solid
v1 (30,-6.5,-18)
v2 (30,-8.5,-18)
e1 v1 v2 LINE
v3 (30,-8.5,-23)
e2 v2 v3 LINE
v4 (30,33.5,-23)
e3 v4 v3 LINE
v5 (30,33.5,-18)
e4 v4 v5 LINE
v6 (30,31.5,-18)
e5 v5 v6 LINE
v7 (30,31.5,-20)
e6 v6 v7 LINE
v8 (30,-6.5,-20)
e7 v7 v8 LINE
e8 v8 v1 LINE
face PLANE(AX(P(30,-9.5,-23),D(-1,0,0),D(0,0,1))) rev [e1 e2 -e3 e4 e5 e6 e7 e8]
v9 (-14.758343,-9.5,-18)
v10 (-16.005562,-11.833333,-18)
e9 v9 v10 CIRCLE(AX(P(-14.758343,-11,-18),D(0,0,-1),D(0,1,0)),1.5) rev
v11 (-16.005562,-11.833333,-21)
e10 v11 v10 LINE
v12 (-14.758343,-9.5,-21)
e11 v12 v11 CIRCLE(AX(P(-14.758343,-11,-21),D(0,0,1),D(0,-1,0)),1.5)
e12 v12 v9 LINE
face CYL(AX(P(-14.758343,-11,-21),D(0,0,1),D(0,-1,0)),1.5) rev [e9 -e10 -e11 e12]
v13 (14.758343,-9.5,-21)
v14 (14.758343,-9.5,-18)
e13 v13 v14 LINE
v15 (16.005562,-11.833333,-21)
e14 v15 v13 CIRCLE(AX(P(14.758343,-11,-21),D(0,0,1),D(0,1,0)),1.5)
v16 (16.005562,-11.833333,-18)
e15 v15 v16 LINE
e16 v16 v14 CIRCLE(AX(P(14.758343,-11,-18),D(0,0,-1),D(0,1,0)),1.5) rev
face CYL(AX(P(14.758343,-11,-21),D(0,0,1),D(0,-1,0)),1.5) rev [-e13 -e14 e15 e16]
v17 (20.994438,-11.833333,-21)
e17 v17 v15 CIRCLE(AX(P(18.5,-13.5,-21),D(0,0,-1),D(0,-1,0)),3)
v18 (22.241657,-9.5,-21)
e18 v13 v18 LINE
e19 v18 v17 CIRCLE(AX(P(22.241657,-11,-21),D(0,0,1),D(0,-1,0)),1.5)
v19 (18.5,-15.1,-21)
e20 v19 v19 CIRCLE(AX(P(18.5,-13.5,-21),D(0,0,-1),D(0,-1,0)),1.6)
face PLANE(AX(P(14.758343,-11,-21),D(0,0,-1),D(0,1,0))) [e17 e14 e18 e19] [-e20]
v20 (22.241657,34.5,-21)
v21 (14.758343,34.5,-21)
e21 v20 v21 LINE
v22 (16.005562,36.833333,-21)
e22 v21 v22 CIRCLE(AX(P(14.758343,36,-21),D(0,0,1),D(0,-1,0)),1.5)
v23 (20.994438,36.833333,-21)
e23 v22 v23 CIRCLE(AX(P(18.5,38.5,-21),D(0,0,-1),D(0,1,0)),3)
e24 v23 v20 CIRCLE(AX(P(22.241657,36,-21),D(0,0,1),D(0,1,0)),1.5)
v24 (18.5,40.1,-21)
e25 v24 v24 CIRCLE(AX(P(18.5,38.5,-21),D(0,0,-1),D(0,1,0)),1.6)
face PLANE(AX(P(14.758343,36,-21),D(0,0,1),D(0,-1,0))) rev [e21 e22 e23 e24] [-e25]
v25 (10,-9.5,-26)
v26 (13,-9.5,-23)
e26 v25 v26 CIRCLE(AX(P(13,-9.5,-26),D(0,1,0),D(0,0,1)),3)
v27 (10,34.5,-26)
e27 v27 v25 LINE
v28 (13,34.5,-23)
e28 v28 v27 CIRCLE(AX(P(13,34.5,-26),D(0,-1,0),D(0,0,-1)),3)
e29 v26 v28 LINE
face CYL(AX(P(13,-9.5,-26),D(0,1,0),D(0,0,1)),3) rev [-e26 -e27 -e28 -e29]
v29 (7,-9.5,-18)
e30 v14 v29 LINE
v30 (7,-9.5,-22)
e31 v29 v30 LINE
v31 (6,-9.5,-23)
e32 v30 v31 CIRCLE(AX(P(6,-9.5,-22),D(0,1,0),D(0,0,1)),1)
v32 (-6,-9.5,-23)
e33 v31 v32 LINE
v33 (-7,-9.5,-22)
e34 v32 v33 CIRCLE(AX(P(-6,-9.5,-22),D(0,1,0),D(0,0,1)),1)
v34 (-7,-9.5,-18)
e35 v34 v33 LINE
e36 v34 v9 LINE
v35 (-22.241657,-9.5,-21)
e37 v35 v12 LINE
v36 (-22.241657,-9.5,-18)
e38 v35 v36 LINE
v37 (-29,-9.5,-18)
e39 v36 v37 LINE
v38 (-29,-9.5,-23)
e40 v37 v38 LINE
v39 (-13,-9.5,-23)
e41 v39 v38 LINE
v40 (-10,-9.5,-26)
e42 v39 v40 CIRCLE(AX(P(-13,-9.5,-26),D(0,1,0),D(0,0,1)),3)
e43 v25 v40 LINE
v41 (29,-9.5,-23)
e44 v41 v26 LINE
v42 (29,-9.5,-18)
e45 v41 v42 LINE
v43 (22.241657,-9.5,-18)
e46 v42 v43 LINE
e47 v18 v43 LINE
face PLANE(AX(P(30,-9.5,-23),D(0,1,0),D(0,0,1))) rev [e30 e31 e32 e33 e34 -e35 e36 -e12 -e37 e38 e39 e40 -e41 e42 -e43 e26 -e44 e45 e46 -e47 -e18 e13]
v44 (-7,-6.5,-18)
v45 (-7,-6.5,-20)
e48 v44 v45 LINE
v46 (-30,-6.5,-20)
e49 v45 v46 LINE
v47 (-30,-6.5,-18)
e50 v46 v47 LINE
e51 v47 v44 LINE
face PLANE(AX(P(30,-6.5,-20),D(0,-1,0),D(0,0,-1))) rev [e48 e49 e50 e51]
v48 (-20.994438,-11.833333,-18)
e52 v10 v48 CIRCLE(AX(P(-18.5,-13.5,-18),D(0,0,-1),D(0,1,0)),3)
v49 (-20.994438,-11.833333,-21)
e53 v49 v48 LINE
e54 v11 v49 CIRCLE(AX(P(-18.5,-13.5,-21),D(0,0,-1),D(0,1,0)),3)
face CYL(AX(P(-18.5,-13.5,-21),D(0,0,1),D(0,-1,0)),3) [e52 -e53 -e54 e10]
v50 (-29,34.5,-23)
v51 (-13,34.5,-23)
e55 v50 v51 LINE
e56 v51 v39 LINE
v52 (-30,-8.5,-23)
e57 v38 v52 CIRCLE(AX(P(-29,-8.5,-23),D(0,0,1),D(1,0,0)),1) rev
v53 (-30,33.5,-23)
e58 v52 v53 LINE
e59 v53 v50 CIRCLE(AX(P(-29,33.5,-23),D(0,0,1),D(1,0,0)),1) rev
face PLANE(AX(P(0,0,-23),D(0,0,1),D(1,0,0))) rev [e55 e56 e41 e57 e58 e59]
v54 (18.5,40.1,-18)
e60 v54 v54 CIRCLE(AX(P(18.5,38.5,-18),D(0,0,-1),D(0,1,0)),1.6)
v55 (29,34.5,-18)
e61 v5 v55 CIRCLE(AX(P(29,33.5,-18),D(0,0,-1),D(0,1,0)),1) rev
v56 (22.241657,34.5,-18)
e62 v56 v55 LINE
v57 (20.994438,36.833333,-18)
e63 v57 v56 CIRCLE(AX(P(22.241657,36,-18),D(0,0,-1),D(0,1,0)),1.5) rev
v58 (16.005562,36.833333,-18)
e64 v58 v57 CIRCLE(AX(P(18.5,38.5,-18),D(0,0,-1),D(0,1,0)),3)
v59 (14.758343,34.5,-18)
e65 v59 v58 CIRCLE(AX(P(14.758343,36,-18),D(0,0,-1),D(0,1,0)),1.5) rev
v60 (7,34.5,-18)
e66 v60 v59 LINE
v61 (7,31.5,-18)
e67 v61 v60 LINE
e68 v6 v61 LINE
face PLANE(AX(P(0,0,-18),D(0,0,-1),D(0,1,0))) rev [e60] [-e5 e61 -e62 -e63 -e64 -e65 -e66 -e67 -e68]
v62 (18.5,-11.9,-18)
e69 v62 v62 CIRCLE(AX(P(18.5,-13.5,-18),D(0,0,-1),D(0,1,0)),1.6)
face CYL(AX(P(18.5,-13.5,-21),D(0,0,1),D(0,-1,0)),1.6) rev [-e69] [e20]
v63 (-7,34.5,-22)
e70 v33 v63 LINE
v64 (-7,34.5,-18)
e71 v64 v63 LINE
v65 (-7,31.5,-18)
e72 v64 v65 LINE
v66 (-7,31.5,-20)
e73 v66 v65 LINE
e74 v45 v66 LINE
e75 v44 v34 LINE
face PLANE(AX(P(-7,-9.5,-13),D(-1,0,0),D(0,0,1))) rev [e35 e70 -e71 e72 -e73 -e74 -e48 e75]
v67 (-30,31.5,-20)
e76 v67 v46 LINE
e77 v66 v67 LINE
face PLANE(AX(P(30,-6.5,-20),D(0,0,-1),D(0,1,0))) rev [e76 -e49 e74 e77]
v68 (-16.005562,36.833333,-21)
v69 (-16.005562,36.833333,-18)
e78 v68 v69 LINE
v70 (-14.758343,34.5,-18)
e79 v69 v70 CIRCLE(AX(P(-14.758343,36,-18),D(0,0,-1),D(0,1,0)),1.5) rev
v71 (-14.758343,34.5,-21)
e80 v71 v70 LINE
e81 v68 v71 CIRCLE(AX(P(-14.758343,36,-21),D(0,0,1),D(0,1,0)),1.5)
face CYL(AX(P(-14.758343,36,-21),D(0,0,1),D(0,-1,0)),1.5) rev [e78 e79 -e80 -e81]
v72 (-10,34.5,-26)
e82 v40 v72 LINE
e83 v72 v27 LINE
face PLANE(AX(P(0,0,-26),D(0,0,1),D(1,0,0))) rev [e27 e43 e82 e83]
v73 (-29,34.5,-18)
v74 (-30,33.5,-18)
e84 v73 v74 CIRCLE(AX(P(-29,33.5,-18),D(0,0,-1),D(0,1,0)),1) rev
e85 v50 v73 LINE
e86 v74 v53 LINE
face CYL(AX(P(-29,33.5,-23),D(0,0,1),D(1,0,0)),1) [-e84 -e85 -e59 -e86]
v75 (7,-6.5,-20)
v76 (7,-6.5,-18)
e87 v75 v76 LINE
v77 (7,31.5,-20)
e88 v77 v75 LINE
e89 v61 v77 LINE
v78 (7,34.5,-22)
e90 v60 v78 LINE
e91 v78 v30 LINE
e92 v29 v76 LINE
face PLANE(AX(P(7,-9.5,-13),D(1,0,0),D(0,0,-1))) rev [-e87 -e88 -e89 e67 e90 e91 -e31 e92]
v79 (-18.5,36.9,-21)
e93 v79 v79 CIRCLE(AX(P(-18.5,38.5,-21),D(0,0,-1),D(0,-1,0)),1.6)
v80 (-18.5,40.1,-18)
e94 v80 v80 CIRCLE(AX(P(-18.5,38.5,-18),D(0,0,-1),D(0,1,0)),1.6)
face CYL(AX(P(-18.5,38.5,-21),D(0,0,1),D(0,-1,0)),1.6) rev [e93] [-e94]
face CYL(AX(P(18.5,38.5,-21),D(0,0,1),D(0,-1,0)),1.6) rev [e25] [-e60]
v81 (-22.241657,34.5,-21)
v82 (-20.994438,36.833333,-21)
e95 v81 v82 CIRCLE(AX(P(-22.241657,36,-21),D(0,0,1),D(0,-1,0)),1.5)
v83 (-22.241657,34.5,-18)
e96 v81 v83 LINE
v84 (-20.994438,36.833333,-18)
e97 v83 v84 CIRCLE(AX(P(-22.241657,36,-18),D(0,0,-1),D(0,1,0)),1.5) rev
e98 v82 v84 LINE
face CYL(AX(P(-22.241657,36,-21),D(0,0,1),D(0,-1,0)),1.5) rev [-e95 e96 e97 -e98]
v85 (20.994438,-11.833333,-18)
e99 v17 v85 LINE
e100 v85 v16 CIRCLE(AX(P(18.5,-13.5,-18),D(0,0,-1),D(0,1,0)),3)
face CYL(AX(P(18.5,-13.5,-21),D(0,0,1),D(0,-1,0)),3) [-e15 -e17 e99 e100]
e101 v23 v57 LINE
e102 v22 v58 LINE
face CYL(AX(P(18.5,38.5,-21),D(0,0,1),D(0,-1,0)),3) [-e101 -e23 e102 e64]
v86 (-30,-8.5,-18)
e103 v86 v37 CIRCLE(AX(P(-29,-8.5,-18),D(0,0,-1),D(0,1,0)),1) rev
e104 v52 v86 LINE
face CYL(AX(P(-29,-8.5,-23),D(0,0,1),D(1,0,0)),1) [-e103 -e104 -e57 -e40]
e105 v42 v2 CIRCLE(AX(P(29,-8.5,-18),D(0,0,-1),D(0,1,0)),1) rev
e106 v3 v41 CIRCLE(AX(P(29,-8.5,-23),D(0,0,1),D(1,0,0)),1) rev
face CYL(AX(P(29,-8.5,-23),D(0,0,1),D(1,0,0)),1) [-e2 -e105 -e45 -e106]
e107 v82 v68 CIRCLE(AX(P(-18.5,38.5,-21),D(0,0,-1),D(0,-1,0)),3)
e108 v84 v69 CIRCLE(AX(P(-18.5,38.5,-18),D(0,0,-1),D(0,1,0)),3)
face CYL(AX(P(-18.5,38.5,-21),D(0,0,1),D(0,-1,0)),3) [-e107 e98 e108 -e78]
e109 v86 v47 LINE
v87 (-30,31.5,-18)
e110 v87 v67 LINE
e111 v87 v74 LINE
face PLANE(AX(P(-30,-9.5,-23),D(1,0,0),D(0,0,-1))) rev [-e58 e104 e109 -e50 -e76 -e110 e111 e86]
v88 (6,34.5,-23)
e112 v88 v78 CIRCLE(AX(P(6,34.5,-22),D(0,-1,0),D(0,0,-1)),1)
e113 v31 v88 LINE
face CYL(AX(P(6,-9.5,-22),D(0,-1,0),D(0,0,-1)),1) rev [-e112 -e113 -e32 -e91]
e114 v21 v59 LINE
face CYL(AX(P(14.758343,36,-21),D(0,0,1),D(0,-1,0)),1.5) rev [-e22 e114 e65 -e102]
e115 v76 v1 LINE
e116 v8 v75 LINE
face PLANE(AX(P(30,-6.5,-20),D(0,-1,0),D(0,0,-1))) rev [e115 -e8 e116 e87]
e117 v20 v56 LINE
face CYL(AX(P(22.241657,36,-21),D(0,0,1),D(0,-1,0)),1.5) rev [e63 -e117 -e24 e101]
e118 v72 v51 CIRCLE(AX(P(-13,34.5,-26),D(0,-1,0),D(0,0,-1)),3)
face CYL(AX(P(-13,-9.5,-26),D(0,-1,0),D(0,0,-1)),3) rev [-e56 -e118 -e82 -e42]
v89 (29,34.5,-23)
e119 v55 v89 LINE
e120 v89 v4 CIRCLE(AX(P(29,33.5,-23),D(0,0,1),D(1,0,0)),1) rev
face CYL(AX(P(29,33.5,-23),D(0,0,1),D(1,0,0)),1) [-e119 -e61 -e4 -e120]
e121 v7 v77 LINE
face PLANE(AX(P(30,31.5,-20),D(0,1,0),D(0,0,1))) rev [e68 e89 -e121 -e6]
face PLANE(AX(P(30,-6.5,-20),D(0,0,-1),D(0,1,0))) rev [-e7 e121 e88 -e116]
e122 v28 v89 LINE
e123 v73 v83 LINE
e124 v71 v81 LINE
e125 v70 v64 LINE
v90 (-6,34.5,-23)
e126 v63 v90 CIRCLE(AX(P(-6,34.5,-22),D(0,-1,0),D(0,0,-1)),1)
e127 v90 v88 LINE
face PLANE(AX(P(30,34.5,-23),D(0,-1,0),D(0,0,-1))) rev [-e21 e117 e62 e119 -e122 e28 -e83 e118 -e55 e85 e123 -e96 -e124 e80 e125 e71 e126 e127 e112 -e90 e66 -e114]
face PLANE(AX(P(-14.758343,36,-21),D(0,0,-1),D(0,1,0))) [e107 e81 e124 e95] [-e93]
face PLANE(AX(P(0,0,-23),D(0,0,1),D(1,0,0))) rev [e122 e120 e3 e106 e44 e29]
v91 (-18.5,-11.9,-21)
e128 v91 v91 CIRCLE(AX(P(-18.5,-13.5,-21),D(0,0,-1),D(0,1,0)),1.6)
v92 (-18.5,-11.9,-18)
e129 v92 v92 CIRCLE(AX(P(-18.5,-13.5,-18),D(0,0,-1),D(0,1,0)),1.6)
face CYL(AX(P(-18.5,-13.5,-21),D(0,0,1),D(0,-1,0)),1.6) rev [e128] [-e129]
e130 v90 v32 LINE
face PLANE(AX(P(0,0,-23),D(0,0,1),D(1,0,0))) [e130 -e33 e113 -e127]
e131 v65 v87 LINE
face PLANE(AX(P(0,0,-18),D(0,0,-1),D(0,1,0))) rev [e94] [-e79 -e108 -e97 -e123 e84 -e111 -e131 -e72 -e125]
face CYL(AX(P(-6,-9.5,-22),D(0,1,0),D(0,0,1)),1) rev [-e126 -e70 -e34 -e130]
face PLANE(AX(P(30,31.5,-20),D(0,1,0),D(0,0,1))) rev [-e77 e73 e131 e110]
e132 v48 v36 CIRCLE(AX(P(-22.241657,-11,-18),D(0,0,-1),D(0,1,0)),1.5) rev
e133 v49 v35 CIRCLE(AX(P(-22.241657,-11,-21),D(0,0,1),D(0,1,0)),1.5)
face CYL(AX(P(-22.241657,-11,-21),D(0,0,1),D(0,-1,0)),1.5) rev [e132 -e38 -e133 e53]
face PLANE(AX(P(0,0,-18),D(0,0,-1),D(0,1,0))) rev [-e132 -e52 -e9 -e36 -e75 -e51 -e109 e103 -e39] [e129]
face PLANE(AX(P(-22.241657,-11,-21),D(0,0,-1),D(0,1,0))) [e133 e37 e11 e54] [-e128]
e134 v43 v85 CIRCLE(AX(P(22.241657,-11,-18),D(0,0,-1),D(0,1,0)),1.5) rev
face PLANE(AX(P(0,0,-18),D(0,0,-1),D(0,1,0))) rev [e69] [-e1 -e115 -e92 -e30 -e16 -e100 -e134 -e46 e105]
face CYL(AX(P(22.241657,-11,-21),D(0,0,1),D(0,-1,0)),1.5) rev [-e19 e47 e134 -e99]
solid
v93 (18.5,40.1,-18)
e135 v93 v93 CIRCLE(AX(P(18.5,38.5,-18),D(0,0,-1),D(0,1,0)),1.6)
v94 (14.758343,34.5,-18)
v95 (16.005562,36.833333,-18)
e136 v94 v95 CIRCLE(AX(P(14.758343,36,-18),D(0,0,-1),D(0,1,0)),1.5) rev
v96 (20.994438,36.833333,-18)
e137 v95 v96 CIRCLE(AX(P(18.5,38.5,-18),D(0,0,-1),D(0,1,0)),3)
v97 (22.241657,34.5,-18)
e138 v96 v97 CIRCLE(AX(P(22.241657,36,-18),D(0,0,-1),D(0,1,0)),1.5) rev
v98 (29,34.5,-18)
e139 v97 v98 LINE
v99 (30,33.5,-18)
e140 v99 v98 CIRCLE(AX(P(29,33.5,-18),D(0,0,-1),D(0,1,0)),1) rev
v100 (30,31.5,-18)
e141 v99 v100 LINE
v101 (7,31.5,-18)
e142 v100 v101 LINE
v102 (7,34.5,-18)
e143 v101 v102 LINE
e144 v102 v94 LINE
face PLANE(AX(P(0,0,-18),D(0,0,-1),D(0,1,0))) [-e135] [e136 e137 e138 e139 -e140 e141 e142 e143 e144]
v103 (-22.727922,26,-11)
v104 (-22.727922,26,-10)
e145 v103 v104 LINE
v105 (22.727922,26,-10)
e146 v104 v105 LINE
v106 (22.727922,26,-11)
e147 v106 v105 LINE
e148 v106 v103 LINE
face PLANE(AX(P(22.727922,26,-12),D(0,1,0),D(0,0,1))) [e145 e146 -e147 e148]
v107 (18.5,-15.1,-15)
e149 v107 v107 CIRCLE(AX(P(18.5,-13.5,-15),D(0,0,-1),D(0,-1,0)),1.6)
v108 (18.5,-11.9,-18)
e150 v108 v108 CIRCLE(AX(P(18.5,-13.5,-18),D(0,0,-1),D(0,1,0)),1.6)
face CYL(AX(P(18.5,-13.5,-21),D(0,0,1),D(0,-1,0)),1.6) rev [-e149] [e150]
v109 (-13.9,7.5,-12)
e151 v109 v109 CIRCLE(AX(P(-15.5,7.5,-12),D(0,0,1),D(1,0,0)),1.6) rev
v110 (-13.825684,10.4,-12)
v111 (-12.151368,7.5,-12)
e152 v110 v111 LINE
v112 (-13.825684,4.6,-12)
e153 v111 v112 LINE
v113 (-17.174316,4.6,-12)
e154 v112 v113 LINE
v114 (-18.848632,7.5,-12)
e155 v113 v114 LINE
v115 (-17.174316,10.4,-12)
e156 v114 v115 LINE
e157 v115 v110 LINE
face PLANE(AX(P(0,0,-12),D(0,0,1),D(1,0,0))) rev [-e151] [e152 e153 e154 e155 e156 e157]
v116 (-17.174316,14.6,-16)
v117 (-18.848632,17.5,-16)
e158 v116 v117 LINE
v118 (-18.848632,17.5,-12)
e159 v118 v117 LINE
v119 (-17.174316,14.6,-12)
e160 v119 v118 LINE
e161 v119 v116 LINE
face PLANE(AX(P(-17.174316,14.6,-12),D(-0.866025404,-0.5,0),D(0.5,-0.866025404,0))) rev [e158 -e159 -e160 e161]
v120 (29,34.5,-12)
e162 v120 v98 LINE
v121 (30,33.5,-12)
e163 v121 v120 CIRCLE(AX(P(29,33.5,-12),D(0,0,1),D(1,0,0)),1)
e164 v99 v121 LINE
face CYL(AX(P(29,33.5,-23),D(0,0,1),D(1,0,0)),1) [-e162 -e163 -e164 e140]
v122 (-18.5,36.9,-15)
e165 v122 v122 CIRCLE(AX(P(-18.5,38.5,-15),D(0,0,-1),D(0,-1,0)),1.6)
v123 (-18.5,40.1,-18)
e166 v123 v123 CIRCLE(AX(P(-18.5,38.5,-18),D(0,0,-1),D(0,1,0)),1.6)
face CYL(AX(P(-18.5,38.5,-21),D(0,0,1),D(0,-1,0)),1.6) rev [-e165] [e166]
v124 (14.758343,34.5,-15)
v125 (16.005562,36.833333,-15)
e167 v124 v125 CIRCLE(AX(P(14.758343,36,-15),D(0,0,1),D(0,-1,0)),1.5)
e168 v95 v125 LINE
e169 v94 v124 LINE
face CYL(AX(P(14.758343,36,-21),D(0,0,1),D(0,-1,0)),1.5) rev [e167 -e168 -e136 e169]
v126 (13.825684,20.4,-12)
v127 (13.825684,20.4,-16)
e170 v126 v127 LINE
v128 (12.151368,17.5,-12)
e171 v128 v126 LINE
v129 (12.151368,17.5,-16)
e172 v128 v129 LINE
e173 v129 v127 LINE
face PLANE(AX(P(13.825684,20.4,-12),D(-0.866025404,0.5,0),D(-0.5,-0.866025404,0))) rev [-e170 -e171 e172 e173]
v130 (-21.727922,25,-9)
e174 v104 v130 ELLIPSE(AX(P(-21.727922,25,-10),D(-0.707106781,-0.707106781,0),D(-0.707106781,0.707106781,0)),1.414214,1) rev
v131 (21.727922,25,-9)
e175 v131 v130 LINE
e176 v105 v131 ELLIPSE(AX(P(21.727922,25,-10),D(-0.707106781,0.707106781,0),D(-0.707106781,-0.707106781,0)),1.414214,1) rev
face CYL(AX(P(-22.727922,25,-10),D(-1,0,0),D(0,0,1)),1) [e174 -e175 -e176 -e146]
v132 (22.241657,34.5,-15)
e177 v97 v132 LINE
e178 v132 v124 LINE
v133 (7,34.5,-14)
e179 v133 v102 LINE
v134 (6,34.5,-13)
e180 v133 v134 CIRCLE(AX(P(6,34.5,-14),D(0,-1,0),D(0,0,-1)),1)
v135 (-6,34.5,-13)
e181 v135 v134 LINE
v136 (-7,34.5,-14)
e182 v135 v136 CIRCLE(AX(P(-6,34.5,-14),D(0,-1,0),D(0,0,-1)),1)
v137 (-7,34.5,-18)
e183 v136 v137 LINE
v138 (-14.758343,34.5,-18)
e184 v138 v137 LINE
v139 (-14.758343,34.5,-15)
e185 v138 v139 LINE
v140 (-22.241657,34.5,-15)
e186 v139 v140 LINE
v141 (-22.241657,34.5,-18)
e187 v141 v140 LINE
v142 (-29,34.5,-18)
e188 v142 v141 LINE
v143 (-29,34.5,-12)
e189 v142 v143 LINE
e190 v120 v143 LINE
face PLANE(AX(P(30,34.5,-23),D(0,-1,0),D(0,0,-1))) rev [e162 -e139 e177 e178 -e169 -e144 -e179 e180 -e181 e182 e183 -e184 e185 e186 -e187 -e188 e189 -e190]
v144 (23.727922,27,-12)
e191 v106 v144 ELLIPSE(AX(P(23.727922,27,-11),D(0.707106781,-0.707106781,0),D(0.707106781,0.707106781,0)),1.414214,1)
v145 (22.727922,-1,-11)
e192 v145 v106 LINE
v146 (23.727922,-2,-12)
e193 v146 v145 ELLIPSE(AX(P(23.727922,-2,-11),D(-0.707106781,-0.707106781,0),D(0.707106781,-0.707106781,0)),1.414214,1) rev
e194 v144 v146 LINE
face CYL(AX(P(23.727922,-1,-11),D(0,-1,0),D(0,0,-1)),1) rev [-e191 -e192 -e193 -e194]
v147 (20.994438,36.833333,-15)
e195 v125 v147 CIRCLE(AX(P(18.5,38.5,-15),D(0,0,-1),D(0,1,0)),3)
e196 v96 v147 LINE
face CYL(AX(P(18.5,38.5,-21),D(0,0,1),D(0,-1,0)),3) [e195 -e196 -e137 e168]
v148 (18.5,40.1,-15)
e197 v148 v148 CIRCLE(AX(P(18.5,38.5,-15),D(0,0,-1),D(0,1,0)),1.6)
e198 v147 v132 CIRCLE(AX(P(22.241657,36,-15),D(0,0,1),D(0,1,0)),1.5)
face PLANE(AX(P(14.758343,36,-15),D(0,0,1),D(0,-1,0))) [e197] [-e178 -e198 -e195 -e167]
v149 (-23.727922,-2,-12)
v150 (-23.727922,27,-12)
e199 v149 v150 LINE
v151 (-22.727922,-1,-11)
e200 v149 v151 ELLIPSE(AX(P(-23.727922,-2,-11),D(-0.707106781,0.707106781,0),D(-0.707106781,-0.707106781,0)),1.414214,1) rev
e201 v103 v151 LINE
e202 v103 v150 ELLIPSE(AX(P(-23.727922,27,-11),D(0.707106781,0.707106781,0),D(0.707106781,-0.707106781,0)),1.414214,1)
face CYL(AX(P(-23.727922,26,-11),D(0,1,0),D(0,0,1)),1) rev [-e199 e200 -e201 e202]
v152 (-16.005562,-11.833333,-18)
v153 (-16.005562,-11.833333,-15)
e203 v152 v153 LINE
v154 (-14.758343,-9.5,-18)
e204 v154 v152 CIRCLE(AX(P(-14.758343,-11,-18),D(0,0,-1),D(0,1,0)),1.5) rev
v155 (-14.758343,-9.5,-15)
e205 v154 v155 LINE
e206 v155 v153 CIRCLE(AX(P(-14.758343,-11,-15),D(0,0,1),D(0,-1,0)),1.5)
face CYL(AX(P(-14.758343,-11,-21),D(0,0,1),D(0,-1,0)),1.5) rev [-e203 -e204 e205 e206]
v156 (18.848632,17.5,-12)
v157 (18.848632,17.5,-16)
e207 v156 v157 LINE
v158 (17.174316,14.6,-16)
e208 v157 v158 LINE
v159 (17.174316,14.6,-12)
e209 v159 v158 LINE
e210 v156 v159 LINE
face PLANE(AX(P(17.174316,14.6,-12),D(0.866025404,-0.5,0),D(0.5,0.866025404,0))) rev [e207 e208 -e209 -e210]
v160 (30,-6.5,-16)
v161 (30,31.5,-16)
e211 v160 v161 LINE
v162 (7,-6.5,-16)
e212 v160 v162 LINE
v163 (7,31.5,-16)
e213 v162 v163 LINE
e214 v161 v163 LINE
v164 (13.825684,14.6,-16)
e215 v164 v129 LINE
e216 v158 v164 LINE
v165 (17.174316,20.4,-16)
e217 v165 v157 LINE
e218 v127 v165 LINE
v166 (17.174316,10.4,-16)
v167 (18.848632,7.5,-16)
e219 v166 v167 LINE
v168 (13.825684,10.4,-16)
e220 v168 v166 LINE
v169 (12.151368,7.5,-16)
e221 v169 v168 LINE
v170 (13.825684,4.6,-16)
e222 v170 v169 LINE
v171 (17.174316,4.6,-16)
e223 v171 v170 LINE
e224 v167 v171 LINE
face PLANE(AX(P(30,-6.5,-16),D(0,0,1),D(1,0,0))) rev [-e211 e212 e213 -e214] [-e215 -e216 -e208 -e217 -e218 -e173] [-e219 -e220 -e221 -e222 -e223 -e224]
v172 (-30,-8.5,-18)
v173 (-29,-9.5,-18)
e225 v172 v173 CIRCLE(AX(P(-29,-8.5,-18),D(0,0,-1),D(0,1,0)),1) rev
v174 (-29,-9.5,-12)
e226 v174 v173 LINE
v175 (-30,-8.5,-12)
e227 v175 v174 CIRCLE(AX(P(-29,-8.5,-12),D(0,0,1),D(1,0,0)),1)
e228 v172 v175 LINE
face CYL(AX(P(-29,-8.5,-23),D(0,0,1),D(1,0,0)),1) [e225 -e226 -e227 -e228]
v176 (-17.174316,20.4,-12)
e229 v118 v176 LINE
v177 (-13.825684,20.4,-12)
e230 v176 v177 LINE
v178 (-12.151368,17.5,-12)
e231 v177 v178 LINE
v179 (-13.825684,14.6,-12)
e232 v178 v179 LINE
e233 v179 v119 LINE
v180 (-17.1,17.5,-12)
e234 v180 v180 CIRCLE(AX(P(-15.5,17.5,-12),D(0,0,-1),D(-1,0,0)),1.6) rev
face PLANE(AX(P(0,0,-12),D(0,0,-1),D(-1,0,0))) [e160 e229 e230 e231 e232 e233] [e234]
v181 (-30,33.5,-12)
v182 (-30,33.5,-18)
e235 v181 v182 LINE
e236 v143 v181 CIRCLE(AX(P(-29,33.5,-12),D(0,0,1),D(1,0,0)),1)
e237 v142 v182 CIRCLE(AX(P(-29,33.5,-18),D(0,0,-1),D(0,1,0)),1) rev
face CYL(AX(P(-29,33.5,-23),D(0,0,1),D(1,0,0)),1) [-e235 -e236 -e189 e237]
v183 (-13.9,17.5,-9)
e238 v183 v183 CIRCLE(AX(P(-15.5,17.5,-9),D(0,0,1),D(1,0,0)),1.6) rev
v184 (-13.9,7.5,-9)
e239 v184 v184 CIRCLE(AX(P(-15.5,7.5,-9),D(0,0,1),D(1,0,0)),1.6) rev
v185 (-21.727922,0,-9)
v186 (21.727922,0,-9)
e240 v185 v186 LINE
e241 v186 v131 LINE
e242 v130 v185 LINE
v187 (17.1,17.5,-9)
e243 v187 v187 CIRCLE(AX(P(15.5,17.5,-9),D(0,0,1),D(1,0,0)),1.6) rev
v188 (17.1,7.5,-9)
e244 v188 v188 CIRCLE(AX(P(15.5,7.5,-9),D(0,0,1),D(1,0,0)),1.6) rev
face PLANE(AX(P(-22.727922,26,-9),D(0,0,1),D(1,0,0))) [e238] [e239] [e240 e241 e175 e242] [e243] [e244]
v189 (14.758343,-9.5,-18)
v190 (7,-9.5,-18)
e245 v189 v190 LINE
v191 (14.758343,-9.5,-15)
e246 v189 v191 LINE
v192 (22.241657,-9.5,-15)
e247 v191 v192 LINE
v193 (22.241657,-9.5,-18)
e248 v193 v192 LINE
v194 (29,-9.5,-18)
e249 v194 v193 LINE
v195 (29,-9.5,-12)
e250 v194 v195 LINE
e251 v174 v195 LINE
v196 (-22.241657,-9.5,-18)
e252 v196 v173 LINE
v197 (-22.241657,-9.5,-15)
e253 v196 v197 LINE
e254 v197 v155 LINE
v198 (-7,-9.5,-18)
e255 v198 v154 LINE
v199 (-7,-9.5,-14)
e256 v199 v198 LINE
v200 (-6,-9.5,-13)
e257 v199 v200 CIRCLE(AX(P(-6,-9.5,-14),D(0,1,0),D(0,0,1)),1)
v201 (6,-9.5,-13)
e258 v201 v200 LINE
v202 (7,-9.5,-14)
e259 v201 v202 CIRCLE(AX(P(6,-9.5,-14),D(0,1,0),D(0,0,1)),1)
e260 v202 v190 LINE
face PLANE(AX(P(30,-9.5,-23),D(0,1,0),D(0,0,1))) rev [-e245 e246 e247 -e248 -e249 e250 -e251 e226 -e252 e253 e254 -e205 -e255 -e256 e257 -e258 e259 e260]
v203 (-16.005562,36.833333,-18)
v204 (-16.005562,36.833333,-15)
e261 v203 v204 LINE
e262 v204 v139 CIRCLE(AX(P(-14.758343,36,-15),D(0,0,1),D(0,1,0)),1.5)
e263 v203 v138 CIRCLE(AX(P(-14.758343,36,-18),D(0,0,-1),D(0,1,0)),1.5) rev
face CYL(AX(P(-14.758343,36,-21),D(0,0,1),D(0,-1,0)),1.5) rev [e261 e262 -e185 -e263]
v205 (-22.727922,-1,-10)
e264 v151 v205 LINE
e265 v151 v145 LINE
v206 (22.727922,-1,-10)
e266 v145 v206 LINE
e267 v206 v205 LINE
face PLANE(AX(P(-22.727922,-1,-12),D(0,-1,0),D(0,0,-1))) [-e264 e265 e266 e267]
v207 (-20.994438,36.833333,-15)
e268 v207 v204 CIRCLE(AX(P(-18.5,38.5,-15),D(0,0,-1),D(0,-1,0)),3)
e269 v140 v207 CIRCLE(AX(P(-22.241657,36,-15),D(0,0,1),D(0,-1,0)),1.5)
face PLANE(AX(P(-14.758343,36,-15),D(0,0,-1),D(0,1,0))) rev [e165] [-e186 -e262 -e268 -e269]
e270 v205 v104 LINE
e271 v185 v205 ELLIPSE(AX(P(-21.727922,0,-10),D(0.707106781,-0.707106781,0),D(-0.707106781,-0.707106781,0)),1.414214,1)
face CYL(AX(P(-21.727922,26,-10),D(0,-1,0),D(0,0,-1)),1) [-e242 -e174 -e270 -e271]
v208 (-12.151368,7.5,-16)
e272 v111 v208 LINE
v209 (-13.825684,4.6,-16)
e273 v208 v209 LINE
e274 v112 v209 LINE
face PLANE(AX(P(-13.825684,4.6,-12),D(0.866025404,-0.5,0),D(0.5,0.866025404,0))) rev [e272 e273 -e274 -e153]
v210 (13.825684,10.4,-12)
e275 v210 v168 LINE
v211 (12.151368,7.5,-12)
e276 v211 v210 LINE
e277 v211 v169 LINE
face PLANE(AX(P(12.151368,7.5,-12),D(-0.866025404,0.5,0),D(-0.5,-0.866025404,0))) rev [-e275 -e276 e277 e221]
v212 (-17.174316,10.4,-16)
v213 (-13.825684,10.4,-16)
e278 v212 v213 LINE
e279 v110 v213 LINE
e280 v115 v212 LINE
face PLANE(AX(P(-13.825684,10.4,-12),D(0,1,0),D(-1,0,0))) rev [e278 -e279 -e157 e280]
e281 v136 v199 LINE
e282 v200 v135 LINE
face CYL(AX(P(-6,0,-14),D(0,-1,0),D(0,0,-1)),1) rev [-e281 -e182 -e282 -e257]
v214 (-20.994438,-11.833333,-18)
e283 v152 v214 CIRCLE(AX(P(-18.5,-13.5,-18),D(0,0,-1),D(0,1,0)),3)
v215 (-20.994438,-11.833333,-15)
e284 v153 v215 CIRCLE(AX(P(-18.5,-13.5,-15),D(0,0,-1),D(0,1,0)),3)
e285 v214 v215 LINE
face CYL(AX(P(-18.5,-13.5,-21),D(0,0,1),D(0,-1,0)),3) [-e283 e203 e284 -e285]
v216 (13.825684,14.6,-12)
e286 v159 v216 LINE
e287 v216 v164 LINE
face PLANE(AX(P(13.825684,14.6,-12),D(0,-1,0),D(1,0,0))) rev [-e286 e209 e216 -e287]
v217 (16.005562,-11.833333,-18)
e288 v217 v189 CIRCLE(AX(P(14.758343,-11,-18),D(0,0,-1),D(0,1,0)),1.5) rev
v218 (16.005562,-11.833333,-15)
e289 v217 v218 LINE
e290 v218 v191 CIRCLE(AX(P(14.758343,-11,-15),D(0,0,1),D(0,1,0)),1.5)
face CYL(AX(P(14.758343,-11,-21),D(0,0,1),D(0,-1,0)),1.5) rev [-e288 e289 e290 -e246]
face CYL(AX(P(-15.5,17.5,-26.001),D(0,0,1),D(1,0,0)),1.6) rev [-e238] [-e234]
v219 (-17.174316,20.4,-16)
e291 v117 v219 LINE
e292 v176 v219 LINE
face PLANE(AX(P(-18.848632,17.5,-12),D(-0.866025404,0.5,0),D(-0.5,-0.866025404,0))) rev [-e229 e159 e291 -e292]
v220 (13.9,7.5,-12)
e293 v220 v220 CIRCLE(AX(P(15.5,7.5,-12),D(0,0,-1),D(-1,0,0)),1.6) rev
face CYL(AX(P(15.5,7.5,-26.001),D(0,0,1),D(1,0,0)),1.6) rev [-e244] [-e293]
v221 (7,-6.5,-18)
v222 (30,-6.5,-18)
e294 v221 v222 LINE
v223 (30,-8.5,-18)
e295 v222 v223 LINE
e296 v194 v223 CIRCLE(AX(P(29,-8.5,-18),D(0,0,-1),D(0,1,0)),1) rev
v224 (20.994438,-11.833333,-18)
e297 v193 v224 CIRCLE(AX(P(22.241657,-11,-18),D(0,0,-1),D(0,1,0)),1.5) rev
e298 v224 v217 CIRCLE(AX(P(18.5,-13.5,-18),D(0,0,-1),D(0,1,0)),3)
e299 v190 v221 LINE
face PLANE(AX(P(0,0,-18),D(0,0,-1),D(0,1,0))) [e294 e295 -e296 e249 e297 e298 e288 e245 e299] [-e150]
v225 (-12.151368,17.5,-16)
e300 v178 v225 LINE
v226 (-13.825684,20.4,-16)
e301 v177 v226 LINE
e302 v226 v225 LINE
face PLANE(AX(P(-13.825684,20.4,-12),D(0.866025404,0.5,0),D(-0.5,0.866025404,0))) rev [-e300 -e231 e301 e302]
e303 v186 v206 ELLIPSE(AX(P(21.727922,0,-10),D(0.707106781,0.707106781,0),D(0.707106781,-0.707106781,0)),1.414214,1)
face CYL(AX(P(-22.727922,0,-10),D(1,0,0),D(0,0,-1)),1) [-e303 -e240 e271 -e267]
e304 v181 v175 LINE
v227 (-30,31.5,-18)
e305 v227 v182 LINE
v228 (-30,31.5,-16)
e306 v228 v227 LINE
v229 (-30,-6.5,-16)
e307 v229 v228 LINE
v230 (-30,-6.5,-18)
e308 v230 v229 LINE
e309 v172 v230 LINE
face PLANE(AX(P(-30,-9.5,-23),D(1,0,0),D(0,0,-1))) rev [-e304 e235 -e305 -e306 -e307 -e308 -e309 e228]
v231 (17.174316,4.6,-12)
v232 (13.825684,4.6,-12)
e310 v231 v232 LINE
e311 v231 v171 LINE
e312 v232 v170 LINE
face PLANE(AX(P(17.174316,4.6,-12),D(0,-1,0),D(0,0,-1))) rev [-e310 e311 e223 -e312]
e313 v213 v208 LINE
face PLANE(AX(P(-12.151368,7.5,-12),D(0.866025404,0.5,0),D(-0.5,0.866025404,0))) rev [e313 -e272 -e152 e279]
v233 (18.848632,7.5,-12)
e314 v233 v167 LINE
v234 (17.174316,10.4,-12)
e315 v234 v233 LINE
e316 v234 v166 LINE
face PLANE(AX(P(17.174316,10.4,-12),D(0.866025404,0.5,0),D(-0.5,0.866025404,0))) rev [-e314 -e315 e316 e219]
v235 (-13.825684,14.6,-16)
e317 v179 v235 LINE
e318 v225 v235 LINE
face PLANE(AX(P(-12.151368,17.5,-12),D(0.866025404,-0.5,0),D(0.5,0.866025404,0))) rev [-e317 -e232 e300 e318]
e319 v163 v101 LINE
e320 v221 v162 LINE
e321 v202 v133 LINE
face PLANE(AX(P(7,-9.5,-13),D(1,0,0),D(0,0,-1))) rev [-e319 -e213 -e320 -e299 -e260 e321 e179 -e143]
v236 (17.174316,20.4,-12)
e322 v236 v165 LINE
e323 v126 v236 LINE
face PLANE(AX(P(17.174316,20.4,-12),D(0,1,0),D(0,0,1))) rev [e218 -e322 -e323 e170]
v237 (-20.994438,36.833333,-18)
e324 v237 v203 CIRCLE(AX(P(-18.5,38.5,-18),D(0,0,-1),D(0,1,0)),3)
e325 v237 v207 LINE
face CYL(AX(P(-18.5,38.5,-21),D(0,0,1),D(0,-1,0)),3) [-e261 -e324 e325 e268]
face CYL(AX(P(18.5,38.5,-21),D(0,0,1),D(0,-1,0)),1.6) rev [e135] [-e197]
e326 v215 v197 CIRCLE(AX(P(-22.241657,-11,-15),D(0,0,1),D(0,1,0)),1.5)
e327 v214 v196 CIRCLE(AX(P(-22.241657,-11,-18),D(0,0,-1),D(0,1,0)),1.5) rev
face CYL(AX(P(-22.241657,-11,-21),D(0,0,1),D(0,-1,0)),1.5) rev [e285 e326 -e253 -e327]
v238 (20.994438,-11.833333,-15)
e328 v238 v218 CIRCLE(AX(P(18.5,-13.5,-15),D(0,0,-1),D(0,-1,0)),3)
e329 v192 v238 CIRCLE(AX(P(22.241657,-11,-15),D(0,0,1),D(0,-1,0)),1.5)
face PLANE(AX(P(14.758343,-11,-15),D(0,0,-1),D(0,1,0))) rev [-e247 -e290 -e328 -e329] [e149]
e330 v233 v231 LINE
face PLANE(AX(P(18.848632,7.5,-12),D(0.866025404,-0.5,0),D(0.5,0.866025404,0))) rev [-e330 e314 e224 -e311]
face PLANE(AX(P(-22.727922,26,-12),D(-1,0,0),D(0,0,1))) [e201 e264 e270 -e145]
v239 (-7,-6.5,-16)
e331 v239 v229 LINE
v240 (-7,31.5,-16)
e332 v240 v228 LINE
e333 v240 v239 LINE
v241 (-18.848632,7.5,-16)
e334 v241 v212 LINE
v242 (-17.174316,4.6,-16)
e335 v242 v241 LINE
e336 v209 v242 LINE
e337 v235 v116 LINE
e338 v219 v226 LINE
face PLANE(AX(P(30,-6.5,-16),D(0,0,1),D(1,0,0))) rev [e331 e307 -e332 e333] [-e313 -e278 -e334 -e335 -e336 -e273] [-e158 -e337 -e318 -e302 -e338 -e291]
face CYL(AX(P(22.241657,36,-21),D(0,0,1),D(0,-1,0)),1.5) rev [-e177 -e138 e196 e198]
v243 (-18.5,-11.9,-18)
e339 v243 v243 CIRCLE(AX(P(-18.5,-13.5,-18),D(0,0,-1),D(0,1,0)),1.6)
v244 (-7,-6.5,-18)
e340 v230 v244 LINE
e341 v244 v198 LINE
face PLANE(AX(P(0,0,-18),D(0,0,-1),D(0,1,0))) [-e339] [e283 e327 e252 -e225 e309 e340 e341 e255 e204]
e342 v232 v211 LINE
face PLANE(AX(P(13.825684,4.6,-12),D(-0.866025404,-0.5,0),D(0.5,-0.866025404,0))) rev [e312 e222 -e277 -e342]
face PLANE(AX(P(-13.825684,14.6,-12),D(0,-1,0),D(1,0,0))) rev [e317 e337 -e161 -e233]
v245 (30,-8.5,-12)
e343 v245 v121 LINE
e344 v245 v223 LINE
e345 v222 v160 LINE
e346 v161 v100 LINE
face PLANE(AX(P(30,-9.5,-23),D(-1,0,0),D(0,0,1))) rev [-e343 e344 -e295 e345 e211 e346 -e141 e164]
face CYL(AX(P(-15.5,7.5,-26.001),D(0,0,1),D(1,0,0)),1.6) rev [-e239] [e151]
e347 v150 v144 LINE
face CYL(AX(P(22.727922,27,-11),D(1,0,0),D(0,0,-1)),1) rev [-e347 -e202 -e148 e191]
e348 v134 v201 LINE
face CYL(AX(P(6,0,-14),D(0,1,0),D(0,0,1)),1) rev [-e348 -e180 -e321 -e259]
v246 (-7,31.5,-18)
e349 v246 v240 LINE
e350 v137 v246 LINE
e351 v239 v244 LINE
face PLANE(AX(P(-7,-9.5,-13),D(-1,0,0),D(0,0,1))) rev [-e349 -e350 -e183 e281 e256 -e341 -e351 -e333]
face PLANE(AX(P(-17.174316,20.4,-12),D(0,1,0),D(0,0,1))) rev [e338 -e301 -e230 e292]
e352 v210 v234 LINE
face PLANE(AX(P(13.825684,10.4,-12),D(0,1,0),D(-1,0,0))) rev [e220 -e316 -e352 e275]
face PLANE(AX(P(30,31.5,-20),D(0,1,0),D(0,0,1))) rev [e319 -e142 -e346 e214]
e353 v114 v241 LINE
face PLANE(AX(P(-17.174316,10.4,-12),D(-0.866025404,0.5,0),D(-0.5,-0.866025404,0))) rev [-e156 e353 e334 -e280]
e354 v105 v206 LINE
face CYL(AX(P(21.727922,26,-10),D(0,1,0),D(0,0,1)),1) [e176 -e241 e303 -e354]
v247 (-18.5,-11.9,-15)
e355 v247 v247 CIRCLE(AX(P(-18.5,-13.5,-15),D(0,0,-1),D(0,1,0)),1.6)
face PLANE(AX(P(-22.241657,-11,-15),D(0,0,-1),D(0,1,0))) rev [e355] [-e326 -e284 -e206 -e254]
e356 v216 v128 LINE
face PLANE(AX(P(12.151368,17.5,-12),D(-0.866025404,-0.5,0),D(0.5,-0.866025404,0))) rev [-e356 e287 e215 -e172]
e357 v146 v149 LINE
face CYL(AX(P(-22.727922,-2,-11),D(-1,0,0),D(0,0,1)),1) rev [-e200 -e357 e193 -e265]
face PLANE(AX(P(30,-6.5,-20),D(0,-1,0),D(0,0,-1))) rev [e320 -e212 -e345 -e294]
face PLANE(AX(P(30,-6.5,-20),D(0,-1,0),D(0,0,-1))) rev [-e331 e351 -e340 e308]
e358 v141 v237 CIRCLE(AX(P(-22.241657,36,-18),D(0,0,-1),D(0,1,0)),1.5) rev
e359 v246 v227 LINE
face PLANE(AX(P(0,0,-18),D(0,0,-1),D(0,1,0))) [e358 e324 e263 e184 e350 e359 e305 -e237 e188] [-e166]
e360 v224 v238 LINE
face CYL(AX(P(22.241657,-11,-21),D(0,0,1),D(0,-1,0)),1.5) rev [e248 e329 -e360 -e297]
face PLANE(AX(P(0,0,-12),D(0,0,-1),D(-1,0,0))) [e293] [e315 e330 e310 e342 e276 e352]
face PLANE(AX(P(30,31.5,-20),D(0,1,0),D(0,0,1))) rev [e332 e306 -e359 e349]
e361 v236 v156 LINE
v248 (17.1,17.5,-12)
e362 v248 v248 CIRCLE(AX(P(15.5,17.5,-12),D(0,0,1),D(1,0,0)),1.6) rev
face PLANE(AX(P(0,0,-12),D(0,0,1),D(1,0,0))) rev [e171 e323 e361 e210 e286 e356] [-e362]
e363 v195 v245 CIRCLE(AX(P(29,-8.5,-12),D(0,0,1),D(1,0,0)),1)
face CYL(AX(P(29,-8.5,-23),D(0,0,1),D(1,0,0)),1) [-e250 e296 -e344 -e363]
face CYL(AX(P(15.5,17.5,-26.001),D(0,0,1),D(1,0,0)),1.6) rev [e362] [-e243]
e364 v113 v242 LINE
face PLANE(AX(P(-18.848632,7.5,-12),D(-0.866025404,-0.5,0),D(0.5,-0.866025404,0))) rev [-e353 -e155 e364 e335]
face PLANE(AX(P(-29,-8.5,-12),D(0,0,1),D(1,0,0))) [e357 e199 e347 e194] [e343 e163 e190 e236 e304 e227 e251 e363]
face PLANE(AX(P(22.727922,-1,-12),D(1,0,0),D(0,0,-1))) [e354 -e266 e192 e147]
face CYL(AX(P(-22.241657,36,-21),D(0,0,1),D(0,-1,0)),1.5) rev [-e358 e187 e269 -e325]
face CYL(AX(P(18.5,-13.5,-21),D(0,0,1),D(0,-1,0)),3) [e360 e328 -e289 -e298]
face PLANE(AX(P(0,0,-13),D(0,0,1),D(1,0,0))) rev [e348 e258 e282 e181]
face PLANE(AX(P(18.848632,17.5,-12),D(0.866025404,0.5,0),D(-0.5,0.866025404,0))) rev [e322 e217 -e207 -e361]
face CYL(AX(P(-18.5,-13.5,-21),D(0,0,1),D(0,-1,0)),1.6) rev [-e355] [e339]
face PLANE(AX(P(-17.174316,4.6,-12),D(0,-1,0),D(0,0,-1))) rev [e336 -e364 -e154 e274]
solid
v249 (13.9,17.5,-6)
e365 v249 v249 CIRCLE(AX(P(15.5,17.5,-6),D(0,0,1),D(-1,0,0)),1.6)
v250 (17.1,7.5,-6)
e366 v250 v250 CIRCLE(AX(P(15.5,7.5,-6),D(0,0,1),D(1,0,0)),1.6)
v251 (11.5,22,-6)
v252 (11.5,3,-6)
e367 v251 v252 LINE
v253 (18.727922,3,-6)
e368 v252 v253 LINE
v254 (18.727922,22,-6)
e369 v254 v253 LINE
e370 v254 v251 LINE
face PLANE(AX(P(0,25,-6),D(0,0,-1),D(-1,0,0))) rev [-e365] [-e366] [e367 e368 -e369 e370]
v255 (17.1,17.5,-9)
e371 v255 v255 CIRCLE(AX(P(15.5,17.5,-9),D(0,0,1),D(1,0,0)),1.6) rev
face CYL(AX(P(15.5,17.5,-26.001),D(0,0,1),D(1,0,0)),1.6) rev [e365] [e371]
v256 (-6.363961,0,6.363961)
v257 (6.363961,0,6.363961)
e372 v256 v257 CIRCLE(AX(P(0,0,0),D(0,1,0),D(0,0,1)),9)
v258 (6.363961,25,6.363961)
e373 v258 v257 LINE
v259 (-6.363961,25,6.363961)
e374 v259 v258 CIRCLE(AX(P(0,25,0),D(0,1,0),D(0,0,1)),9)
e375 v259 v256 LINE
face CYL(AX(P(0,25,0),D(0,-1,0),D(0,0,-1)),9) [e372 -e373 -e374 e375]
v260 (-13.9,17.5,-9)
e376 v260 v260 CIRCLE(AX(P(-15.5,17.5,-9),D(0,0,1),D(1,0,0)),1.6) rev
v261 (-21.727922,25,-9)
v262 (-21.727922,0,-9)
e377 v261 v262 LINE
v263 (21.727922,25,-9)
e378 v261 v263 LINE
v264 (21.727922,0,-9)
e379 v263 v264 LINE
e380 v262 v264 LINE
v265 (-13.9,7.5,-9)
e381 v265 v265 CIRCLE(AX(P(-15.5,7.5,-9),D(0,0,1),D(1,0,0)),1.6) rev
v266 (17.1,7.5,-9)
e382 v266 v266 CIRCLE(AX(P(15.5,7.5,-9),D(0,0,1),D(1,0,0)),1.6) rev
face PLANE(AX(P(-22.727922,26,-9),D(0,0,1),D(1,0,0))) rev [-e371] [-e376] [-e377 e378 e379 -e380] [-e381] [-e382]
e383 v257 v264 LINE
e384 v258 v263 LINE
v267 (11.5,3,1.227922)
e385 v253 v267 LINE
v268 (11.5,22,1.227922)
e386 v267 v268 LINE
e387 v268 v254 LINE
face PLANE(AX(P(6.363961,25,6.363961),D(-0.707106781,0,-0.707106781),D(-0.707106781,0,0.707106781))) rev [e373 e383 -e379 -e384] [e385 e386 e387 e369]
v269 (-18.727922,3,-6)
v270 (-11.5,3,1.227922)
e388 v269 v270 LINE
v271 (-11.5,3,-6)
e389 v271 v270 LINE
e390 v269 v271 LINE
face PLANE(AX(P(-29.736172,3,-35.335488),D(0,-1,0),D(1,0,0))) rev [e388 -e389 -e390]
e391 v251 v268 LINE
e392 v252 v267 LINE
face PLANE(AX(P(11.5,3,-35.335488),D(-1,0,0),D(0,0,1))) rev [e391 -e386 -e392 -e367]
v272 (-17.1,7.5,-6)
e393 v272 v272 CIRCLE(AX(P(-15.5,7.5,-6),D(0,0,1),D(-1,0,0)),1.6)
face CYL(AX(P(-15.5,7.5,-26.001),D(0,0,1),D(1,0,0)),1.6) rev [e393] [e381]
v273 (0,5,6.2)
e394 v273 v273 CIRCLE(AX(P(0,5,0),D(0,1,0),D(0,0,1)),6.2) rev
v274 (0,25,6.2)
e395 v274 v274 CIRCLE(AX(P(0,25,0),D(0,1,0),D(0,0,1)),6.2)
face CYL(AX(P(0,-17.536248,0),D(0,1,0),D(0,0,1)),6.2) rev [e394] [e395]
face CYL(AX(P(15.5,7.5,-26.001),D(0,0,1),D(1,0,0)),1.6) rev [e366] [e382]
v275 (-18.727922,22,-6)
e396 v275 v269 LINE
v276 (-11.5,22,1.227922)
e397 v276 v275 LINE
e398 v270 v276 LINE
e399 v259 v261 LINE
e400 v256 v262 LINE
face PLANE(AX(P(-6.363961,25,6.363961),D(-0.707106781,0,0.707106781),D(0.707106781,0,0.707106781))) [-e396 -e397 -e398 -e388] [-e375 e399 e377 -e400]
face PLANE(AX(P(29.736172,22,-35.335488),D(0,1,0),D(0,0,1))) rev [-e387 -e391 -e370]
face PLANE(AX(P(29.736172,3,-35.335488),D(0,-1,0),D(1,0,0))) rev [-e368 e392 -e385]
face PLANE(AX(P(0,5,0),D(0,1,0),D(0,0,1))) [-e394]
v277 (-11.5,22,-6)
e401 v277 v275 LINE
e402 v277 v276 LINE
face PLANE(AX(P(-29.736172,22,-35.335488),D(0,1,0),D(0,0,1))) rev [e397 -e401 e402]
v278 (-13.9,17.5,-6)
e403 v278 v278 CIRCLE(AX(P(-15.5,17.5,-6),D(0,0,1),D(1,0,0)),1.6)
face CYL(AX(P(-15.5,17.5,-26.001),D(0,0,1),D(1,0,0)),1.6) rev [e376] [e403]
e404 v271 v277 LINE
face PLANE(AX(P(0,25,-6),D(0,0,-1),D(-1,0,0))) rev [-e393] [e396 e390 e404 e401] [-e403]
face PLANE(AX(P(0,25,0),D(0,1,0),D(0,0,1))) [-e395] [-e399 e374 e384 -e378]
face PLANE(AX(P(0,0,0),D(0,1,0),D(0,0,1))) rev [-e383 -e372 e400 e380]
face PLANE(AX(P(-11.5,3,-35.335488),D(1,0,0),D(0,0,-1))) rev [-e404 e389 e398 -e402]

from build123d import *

# Parameters (mm, degrees)
EXTRUDE_1_DEPTH     = 25
SKETCH_2_R          = 6.2
CUT_EXTRUDE_1_DEPTH = 20
SKETCH_3_W          = 18.236171571
SKETCH_3_H          = 19
CUT_EXTRUDE_2_DEPTH = 15
SKETCH_5_W          = 60
SKETCH_5_H          = 44
EXTRUDE_2_DEPTH     = 14
SKETCH_6_W          = 4
SKETCH_6_H          = 38
CUT_EXTRUDE_4_DEPTH = 73.933188604
SKETCH_7_W          = 14
SKETCH_7_H          = 44
CUT_EXTRUDE_5_DEPTH = 10
SKETCH_9_R          = 1.6
EXTRUDE_3_DEPTH     = 3
SKETCH_10_W         = 20
SKETCH_10_H         = 44
EXTRUDE_4_DEPTH     = 3
FILLET_1_R          = 3
FILLET_2_R          = 1
FILLET_3_R          = 1
SKETCH_4_R          = 1.6
CUT_EXTRUDE_3_DEPTH = 10
CUT_EXTRUDE_6_DEPTH = 4
CUT_EXTRUDE_START   = -3
SKETCH_11_W         = 45.455844122
SKETCH_11_H         = 27
CUT_EXTRUDE_7_DEPTH = 3
FILLET_4_R          = 1
FILLET_5_R          = 1


# Read off the part's stored shape, not the designer's step: 分割2
with BuildPart() as part:
    # 草图1 → 凸台-拉伸1 (new body)
    with BuildSketch(Plane(origin=(0, 0, 0), x_dir=(1, 0, 0), z_dir=(0, 1, 0))):
        with BuildLine():
            ThreePointArc((-6.363961031, -6.363961031), (-8.314915793, 3.444150891), (-1e-09, 9))
            Line((-1e-09, 9), (-21.727922061, 9))
            Line((-21.727922061, 9), (-6.363961031, -6.363961031))
        make_face()
        with BuildLine():
            Line((21.727922061, 9), (-1e-09, 9))
            ThreePointArc((-1e-09, 9), (6.36396103, 6.363961031), (9, 0))
            ThreePointArc((9, 0), (8.314915793, -3.444150891), (6.363961031, -6.363961031))
            Line((6.363961031, -6.363961031), (21.727922061, 9))
        make_face()
        with BuildLine():
            ThreePointArc((9, 0), (6.36396103, 6.363961031), (-1e-09, 9))
            Line((0, 9), (0, -9))
            ThreePointArc((0, -9), (3.444150891, -8.314915793), (6.363961031, -6.363961031))
            ThreePointArc((6.363961031, -6.363961031), (8.314915793, -3.444150891), (9, 0))
        make_face()
        with BuildLine():
            Line((0, -9), (0, 9))
            ThreePointArc((-1e-09, 9), (-8.314915793, 3.444150891), (-6.363961031, -6.363961031))
            ThreePointArc((-6.363961031, -6.363961031), (-3.444150891, -8.314915793), (0, -9))
        make_face()
    extrude(amount=EXTRUDE_1_DEPTH)

    # 草图2 → 切除-拉伸1 (cut)
    with BuildSketch(Plane(origin=(0, 25, 0), x_dir=(1, 0, 0), z_dir=(0, 1, 0))):
        with Locations(Location((0, 0, 0), (0, 0, 270))):
            Circle(SKETCH_2_R)
    extrude(amount=-CUT_EXTRUDE_1_DEPTH, mode=Mode.SUBTRACT)

    # 草图3 → 切除-拉伸2 (cut)
    with BuildSketch(Plane.XY.offset(9)):
        with Locations((20.618085785, 12.5)):
            Rectangle(SKETCH_3_W, SKETCH_3_H)
        with Locations((-20.618085785, 12.5)):
            Rectangle(SKETCH_3_W, SKETCH_3_H)
    extrude(amount=-CUT_EXTRUDE_2_DEPTH, mode=Mode.SUBTRACT)

    # 草图5 → 凸台-拉伸2 (add)
    with BuildSketch(Plane(origin=(0, 0, -9), x_dir=(-1, 0, 0), z_dir=(0, 0, -1))):
        with Locations((0, 12.5)):
            Rectangle(SKETCH_5_W, SKETCH_5_H)
    extrude(amount=EXTRUDE_2_DEPTH)

    # 草图6 → 切除-拉伸4 (cut, through all)
    with BuildSketch(Plane.ZY.offset(30)):
        with Locations((-18, 12.5)):
            Rectangle(SKETCH_6_W, SKETCH_6_H)
    extrude(amount=-CUT_EXTRUDE_4_DEPTH, mode=Mode.SUBTRACT)

    # 草图7 → 切除-拉伸5 (cut)
    with BuildSketch(Plane(origin=(0, 0, -23), x_dir=(-1, 0, 0), z_dir=(0, 0, -1))):
        with Locations((0, 12.5)):
            Rectangle(SKETCH_7_W, SKETCH_7_H)
    extrude(amount=-CUT_EXTRUDE_5_DEPTH, mode=Mode.SUBTRACT)

    # 草图9 → 凸台-拉伸3 (add, symmetric)
    # profile 1 of 4: a face of its own
    with BuildSketch(Plane(origin=(0, 0, -18), x_dir=(-1, 0, 0), z_dir=(0, 0, -1))):
        with BuildLine():
            Line((-22.241657387, 34.5), (-14.758342613, 34.5))
            ThreePointArc((-14.758342613, 34.5), (-16.081218269, 35.292893219), (-16.005561742, 36.833333333))
            ThreePointArc((-16.005561742, 36.833333333), (-18.5, 41.5), (-20.994438258, 36.833333333))
            ThreePointArc((-20.994438258, 36.833333333), (-20.918781731, 35.292893219), (-22.241657387, 34.5))
        make_face()
        with Locations(Location((-18.5, 38.5, 0), (0, 0, 90))):
            Circle(SKETCH_9_R, mode=Mode.SUBTRACT)
    # profile 2 of 4: a face of its own
    with BuildSketch(Plane(origin=(0, 0, -18), x_dir=(-1, 0, 0), z_dir=(0, 0, -1))):
        with BuildLine():
            Line((22.241657387, 34.5), (14.758342613, 34.5))
            ThreePointArc((14.758342613, 34.5), (16.081218269, 35.292893219), (16.005561742, 36.833333333))
            ThreePointArc((16.005561742, 36.833333333), (18.5, 41.5), (20.994438258, 36.833333333))
            ThreePointArc((20.994438258, 36.833333333), (20.918781731, 35.292893219), (22.241657387, 34.5))
        make_face()
        with Locations(Location((18.5, 38.5, 0), (0, 0, 270))):
            Circle(SKETCH_9_R, mode=Mode.SUBTRACT)
    # profile 3 of 4: a face of its own
    with BuildSketch(Plane(origin=(0, 0, -18), x_dir=(-1, 0, 0), z_dir=(0, 0, -1))):
        with BuildLine():
            Line((-22.241657387, -9.5), (-14.758342613, -9.5))
            ThreePointArc((-14.758342613, -9.5), (-16.081218269, -10.292893219), (-16.005561742, -11.833333333))
            ThreePointArc((-16.005561742, -11.833333333), (-18.5, -16.5), (-20.994438258, -11.833333333))
            ThreePointArc((-20.994438258, -11.833333333), (-20.918781731, -10.292893219), (-22.241657387, -9.5))
        make_face()
        with Locations(Location((-18.5, -13.5, 0), (0, 0, 270))):
            Circle(SKETCH_9_R, mode=Mode.SUBTRACT)
    # profile 4 of 4: a face of its own
    with BuildSketch(Plane(origin=(0, 0, -18), x_dir=(-1, 0, 0), z_dir=(0, 0, -1))):
        with BuildLine():
            Line((22.241657387, -9.5), (14.758342613, -9.5))
            ThreePointArc((14.758342613, -9.5), (16.081218269, -10.292893219), (16.005561742, -11.833333333))
            ThreePointArc((16.005561742, -11.833333333), (18.5, -16.5), (20.994438258, -11.833333333))
            ThreePointArc((20.994438258, -11.833333333), (20.918781731, -10.292893219), (22.241657387, -9.5))
        make_face()
        with Locations(Location((18.5, -13.5, 0), (0, 0, 90))):
            Circle(SKETCH_9_R, mode=Mode.SUBTRACT)
    extrude(amount=EXTRUDE_3_DEPTH, both=True)

    # 草图10 → 凸台-拉伸4 (add)
    with BuildSketch(Plane(origin=(0, 0, -23), x_dir=(-1, 0, 0), z_dir=(0, 0, -1))):
        with Locations((0, 12.5)):
            Rectangle(SKETCH_10_W, SKETCH_10_H)
    extrude(amount=EXTRUDE_4_DEPTH)

    # 圆角1
    fillet_1_edges = [part.edges().sort_by_distance(p)[0] for p in [
        (-10, 12.5, -23),
        (10, 12.5, -23),
    ]]
    fillet(fillet_1_edges, radius=FILLET_1_R - 0.0001)  # a hair under: the kernel refuses the full size

    # 圆角2
    fillet_2_edges = [part.edges().sort_by_distance(p)[0] for p in [
        (-7, 12.5, -13),
        (7, 12.5, -13),
        (-7, 12.5, -23),
        (7, 12.5, -23),
    ]]
    fillet(fillet_2_edges, radius=FILLET_2_R)

    # 圆角3
    fillet_3_edges = [part.edges().sort_by_distance(p)[0] for p in [
        (-30, -9.5, -16),
        (-30, 34.5, -16),
        (30, 34.5, -16),
        (30, -9.5, -16),
    ]]
    fillet(fillet_3_edges, radius=FILLET_3_R)


with BuildPart() as body_2:
    # Split Bodies 1: the piece on the far side of the plane
    add(part.part)
    split(bisect_by=Plane(origin=(0, 0, -18), x_dir=(0, -1, 0), z_dir=(0, 0, -1)), keep=Keep.BOTTOM)

    # 草图4 → 切除-拉伸3 (cut)
    with BuildSketch(Plane.XY.offset(-6)):
        with Locations((-15.5, 17.5)):
            Circle(SKETCH_4_R)
        with Locations((-15.5, 7.5)):
            Circle(SKETCH_4_R)
        with Locations((15.5, 7.5)):
            Circle(SKETCH_4_R)
        with Locations((15.5, 17.5)):
            Circle(SKETCH_4_R)
    extrude(amount=-CUT_EXTRUDE_3_DEPTH, mode=Mode.SUBTRACT)

    # 草图8 → 切除-拉伸6 (cut)
    with BuildSketch(Plane(origin=(0, 0, -16), x_dir=(-1, 0, 0), z_dir=(0, 0, -1))):
        Polygon((17.174315781, 10.4), (18.848631561, 7.5), (17.174315781, 4.6), (13.825684219, 4.6), (12.151368439, 7.5), (13.825684219, 10.4), align=None)
        Polygon((18.848631561, 17.5), (17.174315781, 20.4), (13.825684219, 20.4), (12.151368439, 17.5), (13.825684219, 14.6), (17.174315781, 14.6), align=None)
        Polygon((-13.825684219, 10.4), (-17.174315781, 10.4), (-18.848631561, 7.5), (-17.174315781, 4.6), (-13.825684219, 4.6), (-12.151368439, 7.5), align=None)
        Polygon((-17.174315781, 14.6), (-18.848631561, 17.5), (-17.174315781, 20.4), (-13.825684219, 20.4), (-12.151368439, 17.5), (-13.825684219, 14.6), align=None)
    extrude(amount=-CUT_EXTRUDE_6_DEPTH, mode=Mode.SUBTRACT)

    # 草图11 → 切除-拉伸7 (cut)
    with BuildSketch(Plane.XY.offset(-9).offset(CUT_EXTRUDE_START)):
        with BuildLine():
            Line((-29, -9.5), (29, -9.5))
            ThreePointArc((29, -9.5), (29.707106781, -9.207106781), (30, -8.5))
            Line((30, -8.5), (30, 33.5))
            ThreePointArc((30, 33.5), (29.707106781, 34.207106781), (29, 34.5))
            Line((29, 34.5), (-29, 34.5))
            ThreePointArc((-29, 34.5), (-29.707106781, 34.207106781), (-30, 33.5))
            Line((-30, 33.5), (-30, -8.5))
            ThreePointArc((-30, -8.5), (-29.707106781, -9.207106781), (-29, -9.5))
        make_face()
        with Locations((0, 12.5)):
            Rectangle(SKETCH_11_W, SKETCH_11_H, mode=Mode.SUBTRACT)
    extrude(amount=CUT_EXTRUDE_7_DEPTH, mode=Mode.SUBTRACT)


with BuildPart() as part_1:
    add(part.part)

    # Split Bodies 1
    split(bisect_by=Plane(origin=(0, 0, -18), x_dir=(0, -1, 0), z_dir=(0, 0, -1)), keep=Keep.TOP)


with BuildPart() as body_3:
    # Split Bodies 2: the piece on the far side of the plane
    add(body_2.part)
    split(bisect_by=Plane.XY.offset(-9), keep=Keep.BOTTOM)

    # 圆角4
    fillet_4_edges = [body_3.edges().sort_by_distance(p)[0] for p in [
        (-22.727922061, 12.5, -12),
        (0, -1, -12),
        (22.727922061, 12.5, -12),
        (0, 26, -12),
    ]]
    fillet(fillet_4_edges, radius=FILLET_4_R)

    # 圆角5
    fillet_5_edges = [body_3.edges().sort_by_distance(p)[0] for p in [
        (-22.727922061, 12.5, -9),
        (0, -1, -9),
        (22.727922061, 12.5, -9),
        (0, 26, -9),
    ]]
    fillet(fillet_5_edges, radius=FILLET_5_R)


with BuildPart() as body_2_1:
    add(body_2.part)

    # Split Bodies 2
    split(bisect_by=Plane.XY.offset(-9), keep=Keep.TOP)


solid = Compound([part_1.part, body_3.part, body_2_1.part])
